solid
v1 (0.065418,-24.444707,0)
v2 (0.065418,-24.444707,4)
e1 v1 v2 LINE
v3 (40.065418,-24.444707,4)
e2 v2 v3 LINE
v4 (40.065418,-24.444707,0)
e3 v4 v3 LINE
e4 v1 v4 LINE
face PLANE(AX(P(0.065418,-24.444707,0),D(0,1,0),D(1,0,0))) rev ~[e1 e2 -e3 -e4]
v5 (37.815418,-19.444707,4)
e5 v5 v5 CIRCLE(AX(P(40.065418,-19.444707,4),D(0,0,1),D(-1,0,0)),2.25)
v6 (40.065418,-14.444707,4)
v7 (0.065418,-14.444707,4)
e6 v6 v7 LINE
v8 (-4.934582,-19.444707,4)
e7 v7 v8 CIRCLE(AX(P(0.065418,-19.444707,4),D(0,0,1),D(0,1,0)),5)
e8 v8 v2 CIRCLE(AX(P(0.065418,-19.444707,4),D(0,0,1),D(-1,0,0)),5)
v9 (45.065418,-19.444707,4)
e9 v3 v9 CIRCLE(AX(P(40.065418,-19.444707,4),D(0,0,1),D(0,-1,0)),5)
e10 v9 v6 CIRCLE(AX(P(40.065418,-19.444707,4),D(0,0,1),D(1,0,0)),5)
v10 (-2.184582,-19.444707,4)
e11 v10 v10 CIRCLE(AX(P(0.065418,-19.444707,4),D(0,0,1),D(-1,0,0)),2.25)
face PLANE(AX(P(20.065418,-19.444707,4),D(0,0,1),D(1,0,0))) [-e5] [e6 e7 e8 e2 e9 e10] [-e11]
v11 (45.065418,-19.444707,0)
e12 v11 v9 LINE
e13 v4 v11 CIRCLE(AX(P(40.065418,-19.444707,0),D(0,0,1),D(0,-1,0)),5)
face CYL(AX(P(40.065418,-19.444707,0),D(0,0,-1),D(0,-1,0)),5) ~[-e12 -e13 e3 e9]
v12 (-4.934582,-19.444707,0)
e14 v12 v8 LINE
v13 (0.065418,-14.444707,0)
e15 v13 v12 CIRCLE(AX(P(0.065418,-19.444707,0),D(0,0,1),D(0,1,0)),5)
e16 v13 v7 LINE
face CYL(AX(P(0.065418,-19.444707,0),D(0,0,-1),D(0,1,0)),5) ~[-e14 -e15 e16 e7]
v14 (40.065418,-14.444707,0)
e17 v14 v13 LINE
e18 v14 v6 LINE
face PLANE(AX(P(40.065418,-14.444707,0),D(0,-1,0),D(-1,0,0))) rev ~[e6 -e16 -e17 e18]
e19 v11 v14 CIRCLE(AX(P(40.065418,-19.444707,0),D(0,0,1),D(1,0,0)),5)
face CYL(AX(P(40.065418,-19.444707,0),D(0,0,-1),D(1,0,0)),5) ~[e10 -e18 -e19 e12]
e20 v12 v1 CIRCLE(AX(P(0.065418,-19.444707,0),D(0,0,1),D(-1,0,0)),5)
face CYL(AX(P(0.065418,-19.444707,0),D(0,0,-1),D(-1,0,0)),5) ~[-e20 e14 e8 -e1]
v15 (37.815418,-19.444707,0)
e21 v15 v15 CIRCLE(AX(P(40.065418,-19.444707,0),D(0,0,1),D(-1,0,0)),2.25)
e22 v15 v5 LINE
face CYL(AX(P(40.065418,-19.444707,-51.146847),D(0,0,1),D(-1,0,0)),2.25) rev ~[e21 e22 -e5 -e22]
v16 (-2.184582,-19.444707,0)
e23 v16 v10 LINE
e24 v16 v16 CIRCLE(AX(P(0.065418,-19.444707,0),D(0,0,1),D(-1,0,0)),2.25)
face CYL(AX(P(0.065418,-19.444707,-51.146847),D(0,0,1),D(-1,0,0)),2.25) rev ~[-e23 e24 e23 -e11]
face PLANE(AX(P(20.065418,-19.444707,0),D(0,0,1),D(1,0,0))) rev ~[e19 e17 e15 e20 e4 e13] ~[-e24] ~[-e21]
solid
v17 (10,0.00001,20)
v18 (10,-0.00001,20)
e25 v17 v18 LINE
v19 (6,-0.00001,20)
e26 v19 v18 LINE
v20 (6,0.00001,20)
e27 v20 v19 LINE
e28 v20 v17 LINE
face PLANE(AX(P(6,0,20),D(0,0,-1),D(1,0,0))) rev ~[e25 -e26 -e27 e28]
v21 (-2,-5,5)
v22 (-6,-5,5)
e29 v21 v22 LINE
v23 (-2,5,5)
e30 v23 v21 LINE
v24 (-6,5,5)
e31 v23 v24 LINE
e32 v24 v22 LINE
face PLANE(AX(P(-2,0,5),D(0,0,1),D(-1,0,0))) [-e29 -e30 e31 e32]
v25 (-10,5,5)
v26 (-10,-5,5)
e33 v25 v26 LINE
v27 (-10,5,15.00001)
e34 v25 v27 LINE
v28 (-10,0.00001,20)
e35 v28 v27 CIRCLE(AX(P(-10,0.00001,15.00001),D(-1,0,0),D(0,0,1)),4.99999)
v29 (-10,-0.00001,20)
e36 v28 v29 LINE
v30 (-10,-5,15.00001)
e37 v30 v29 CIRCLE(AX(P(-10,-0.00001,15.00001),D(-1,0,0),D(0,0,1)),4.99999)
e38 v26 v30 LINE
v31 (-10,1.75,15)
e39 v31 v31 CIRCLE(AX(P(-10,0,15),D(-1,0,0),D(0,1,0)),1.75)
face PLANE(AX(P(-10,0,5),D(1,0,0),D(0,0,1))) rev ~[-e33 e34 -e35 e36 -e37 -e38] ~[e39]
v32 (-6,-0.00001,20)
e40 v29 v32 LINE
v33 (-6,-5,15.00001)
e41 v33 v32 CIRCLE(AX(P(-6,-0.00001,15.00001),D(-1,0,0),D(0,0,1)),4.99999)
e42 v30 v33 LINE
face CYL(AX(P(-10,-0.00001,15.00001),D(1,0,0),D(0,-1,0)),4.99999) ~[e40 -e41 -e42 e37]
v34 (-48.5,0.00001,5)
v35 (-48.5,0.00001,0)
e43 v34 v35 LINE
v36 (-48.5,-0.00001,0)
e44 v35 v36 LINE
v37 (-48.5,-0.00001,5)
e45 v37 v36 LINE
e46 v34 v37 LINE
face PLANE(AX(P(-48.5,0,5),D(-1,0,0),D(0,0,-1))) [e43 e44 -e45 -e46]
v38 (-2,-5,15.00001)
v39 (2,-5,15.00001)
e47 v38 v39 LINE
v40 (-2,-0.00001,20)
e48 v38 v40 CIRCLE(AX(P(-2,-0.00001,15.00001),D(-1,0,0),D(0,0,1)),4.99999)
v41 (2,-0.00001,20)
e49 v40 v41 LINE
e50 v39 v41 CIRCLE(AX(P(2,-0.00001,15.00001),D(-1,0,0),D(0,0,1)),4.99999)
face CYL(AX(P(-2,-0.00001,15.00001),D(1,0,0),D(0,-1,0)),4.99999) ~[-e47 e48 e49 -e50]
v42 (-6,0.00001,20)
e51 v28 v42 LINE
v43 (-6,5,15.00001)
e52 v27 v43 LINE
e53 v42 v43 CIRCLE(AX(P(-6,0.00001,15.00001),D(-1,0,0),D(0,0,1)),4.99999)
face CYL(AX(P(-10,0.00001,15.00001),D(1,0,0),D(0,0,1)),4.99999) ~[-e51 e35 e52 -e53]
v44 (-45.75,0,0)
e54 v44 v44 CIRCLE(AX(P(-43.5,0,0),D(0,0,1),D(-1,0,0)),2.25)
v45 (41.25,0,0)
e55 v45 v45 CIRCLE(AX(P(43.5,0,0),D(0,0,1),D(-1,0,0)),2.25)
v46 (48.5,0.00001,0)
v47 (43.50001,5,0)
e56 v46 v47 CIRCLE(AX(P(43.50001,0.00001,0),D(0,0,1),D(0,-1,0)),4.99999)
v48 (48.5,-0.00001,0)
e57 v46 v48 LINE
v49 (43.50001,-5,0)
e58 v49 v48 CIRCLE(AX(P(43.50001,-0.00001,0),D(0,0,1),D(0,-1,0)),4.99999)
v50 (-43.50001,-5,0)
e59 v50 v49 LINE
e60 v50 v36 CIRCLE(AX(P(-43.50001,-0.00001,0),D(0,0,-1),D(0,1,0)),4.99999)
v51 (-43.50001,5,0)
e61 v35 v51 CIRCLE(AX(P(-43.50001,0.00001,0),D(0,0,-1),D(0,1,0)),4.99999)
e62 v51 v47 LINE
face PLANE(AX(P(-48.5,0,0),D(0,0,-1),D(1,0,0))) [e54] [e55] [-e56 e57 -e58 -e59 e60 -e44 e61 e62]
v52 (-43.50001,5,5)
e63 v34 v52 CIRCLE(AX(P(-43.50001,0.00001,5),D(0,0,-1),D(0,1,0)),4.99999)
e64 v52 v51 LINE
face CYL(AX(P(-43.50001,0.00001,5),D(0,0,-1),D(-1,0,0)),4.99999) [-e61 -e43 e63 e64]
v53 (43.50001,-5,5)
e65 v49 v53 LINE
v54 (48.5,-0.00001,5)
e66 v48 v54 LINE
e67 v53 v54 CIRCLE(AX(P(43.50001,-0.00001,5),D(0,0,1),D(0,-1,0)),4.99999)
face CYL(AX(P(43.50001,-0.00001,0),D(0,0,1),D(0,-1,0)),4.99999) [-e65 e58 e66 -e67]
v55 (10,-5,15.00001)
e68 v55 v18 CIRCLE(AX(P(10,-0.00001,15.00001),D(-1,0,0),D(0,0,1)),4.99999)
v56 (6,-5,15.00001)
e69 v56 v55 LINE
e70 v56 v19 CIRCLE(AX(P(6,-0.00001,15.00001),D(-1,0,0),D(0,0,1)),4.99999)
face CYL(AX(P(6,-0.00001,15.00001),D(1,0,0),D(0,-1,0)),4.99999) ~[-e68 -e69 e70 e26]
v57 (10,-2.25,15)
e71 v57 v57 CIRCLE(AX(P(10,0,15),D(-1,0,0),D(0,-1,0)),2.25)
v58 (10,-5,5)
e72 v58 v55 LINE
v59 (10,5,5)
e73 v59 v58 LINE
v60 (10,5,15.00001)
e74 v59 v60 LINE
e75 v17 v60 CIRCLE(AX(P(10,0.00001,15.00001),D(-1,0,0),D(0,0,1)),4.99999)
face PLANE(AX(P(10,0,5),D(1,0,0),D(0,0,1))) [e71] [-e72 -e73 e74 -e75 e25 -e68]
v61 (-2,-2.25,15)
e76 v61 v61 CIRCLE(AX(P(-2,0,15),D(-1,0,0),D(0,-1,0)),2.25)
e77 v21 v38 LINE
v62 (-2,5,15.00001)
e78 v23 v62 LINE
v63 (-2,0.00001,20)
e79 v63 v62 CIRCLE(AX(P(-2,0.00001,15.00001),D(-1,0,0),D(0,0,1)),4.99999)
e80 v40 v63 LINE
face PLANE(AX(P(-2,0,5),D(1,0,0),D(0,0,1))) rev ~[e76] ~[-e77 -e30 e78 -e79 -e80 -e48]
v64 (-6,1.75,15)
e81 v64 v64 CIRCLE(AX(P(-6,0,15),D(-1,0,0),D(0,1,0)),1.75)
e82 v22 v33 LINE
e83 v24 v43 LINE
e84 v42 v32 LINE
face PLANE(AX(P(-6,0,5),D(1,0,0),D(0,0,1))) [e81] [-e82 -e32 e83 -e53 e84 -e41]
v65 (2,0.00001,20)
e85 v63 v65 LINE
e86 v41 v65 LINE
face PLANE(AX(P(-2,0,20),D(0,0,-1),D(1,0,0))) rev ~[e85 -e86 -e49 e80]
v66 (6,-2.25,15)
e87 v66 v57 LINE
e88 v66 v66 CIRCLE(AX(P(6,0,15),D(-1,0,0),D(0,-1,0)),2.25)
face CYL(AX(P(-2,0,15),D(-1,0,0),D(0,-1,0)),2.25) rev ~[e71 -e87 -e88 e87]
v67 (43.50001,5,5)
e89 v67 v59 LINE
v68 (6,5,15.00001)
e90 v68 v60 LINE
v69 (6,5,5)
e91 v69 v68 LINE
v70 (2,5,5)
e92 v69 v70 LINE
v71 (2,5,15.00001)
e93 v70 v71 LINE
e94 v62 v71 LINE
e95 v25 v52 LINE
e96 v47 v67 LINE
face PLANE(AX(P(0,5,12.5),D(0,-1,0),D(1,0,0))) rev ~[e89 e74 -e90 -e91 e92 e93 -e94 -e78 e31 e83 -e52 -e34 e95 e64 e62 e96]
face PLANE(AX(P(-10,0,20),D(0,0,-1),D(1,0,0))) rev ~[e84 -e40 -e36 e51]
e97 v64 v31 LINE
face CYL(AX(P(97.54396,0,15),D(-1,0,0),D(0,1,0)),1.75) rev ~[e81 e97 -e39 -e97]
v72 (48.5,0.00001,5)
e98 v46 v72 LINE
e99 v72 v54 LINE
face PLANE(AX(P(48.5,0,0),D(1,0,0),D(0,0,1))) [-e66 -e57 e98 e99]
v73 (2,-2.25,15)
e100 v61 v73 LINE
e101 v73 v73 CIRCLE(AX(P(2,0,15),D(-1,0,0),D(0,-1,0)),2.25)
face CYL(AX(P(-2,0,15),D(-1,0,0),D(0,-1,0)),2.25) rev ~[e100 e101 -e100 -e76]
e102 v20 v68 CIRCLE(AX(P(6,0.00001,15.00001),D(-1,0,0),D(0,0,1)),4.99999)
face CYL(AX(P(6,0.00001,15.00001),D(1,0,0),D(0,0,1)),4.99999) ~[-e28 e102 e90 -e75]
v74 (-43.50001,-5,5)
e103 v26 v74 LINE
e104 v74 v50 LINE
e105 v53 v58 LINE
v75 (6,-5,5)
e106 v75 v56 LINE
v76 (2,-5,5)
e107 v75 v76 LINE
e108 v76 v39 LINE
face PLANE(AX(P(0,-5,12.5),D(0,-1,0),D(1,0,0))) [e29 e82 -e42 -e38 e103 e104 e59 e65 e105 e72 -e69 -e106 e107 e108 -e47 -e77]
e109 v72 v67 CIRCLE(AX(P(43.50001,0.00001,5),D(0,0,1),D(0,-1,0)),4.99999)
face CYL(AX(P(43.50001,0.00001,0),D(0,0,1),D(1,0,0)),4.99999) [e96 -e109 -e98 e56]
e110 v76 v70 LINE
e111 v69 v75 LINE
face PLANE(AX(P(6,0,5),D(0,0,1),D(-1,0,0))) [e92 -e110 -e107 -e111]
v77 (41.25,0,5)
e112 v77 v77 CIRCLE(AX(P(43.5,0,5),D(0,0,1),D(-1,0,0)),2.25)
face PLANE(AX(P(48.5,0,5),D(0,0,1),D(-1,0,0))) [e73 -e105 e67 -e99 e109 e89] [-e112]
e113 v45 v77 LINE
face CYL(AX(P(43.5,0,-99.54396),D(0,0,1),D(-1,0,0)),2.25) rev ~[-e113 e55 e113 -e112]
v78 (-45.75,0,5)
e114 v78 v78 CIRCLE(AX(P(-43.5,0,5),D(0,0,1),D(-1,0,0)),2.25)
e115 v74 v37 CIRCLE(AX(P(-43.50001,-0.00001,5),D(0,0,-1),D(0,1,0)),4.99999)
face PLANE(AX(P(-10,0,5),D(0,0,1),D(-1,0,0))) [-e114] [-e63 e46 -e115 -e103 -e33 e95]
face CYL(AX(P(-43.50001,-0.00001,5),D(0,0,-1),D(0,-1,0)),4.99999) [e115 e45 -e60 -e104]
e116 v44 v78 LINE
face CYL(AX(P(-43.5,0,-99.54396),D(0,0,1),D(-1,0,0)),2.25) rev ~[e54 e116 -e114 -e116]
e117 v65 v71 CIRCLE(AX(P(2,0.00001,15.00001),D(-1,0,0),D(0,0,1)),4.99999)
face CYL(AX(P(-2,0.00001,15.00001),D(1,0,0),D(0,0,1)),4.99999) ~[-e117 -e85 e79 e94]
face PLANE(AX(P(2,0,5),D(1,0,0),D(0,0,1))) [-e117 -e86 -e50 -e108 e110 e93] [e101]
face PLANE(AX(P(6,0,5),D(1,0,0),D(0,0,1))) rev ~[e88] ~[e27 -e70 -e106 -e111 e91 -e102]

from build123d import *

# Parameters (mm, degrees)
F0_W     = 4
F0_H     = 15
F1_DEPTH = 5
F2_R     = 4.99999
F4_D     = 4.5
F6_D     = 4.5
F6_DEPTH = 50.501
F7_D     = 3.5
F9_DEPTH = 4
F10_D    = 4.5


# Not quite as in the source:
# - a fillet or chamfer is up to 0.001 mm smaller than in the source, because OpenCascade refuses the exact size


with BuildPart() as f1:
    # F0 (on Front) → F1 (new body, symmetric)
    with BuildSketch(Plane.XZ):
        with Locations((0, 12.5)):
            Rectangle(F0_W, F0_H)
        with Locations((8, 12.5)):
            Rectangle(F0_W, F0_H)
        with Locations((-8, 12.5)):
            Rectangle(F0_W, F0_H)
        Polygon((-48.5, 5), (-48.5, 0), (48.5, 0), (48.5, 5), (10, 5), (6, 5), (2, 5), (-2, 5), (-6, 5), (-10, 5), align=None)
    extrude(amount=F1_DEPTH, both=True)

    # F2 (radius 5 in the source; OpenCascade refuses exactly that, so slightly less here)
    f2_edges = [f1.edges().sort_by_distance(p)[0] for p in [
        (-48.5, -5, 2.5),
        (-48.5, 5, 2.5),
        (48.5, -5, 2.5),
        (48.5, 5, 2.5),
        (-8, -5, 20),
        (0, -5, 20),
        (8, -5, 20),
        (-8, 5, 20),
        (0, 5, 20),
        (8, 5, 20),
    ]]
    fillet(f2_edges, radius=F2_R)

    # F4 (through all)
    with Locations(Plane(origin=(0, 0, 0), x_dir=(1, 0, 0), z_dir=(0, 0, -1))):
        with Locations((-43.5, 0), (43.5, 0)):
            Hole(F4_D / 2)

    # F6 (through all, one way)
    with BuildSketch(Plane(origin=(-2, 0, 0), x_dir=(0, -1, 0), z_dir=(-1, 0, 0))):
        with Locations((0, 15)):
            Circle(F6_D / 2)
    extrude(amount=-F6_DEPTH, mode=Mode.SUBTRACT)

    # F7 (through all)
    with Locations(Plane(origin=(-2, 0, 0), x_dir=(0, -1, 0), z_dir=(1, 0, 0))):
        with Locations((0, -15)):
            Hole(F7_D / 2)


with BuildPart() as f9:
    # F8 (on Top) → F9 (new body)
    with BuildSketch(Plane.XY):
        with BuildLine():
            Line((40.0654178858, -14.444706738), (0.0654178858, -14.444706738))
            ThreePointArc((0.0654178858, -14.444706738), (-3.4701160202, -15.9091728321), (-4.9345821142, -19.444706738))
            ThreePointArc((-4.9345821142, -19.444706738), (-3.4701160202, -22.9802406439), (0.0654178858, -24.444706738))
            Line((0.0654178858, -24.444706738), (40.0654178858, -24.444706738))
            ThreePointArc((40.0654178858, -24.444706738), (43.6009517917, -22.9802406439), (45.0654178858, -19.444706738))
            ThreePointArc((45.0654178858, -19.444706738), (43.6009517917, -15.9091728321), (40.0654178858, -14.444706738))
        make_face()
    extrude(amount=F9_DEPTH)

    # F10 (through all)
    with Locations(Plane(origin=(0, 0, 0), x_dir=(1, 0, 0), z_dir=(0, 0, -1))):
        with Locations((0.0654178858, 19.444706738), (40.0654178858, 19.444706738)):
            Hole(F10_D / 2)


solid = Compound([f1.part, f9.part])
